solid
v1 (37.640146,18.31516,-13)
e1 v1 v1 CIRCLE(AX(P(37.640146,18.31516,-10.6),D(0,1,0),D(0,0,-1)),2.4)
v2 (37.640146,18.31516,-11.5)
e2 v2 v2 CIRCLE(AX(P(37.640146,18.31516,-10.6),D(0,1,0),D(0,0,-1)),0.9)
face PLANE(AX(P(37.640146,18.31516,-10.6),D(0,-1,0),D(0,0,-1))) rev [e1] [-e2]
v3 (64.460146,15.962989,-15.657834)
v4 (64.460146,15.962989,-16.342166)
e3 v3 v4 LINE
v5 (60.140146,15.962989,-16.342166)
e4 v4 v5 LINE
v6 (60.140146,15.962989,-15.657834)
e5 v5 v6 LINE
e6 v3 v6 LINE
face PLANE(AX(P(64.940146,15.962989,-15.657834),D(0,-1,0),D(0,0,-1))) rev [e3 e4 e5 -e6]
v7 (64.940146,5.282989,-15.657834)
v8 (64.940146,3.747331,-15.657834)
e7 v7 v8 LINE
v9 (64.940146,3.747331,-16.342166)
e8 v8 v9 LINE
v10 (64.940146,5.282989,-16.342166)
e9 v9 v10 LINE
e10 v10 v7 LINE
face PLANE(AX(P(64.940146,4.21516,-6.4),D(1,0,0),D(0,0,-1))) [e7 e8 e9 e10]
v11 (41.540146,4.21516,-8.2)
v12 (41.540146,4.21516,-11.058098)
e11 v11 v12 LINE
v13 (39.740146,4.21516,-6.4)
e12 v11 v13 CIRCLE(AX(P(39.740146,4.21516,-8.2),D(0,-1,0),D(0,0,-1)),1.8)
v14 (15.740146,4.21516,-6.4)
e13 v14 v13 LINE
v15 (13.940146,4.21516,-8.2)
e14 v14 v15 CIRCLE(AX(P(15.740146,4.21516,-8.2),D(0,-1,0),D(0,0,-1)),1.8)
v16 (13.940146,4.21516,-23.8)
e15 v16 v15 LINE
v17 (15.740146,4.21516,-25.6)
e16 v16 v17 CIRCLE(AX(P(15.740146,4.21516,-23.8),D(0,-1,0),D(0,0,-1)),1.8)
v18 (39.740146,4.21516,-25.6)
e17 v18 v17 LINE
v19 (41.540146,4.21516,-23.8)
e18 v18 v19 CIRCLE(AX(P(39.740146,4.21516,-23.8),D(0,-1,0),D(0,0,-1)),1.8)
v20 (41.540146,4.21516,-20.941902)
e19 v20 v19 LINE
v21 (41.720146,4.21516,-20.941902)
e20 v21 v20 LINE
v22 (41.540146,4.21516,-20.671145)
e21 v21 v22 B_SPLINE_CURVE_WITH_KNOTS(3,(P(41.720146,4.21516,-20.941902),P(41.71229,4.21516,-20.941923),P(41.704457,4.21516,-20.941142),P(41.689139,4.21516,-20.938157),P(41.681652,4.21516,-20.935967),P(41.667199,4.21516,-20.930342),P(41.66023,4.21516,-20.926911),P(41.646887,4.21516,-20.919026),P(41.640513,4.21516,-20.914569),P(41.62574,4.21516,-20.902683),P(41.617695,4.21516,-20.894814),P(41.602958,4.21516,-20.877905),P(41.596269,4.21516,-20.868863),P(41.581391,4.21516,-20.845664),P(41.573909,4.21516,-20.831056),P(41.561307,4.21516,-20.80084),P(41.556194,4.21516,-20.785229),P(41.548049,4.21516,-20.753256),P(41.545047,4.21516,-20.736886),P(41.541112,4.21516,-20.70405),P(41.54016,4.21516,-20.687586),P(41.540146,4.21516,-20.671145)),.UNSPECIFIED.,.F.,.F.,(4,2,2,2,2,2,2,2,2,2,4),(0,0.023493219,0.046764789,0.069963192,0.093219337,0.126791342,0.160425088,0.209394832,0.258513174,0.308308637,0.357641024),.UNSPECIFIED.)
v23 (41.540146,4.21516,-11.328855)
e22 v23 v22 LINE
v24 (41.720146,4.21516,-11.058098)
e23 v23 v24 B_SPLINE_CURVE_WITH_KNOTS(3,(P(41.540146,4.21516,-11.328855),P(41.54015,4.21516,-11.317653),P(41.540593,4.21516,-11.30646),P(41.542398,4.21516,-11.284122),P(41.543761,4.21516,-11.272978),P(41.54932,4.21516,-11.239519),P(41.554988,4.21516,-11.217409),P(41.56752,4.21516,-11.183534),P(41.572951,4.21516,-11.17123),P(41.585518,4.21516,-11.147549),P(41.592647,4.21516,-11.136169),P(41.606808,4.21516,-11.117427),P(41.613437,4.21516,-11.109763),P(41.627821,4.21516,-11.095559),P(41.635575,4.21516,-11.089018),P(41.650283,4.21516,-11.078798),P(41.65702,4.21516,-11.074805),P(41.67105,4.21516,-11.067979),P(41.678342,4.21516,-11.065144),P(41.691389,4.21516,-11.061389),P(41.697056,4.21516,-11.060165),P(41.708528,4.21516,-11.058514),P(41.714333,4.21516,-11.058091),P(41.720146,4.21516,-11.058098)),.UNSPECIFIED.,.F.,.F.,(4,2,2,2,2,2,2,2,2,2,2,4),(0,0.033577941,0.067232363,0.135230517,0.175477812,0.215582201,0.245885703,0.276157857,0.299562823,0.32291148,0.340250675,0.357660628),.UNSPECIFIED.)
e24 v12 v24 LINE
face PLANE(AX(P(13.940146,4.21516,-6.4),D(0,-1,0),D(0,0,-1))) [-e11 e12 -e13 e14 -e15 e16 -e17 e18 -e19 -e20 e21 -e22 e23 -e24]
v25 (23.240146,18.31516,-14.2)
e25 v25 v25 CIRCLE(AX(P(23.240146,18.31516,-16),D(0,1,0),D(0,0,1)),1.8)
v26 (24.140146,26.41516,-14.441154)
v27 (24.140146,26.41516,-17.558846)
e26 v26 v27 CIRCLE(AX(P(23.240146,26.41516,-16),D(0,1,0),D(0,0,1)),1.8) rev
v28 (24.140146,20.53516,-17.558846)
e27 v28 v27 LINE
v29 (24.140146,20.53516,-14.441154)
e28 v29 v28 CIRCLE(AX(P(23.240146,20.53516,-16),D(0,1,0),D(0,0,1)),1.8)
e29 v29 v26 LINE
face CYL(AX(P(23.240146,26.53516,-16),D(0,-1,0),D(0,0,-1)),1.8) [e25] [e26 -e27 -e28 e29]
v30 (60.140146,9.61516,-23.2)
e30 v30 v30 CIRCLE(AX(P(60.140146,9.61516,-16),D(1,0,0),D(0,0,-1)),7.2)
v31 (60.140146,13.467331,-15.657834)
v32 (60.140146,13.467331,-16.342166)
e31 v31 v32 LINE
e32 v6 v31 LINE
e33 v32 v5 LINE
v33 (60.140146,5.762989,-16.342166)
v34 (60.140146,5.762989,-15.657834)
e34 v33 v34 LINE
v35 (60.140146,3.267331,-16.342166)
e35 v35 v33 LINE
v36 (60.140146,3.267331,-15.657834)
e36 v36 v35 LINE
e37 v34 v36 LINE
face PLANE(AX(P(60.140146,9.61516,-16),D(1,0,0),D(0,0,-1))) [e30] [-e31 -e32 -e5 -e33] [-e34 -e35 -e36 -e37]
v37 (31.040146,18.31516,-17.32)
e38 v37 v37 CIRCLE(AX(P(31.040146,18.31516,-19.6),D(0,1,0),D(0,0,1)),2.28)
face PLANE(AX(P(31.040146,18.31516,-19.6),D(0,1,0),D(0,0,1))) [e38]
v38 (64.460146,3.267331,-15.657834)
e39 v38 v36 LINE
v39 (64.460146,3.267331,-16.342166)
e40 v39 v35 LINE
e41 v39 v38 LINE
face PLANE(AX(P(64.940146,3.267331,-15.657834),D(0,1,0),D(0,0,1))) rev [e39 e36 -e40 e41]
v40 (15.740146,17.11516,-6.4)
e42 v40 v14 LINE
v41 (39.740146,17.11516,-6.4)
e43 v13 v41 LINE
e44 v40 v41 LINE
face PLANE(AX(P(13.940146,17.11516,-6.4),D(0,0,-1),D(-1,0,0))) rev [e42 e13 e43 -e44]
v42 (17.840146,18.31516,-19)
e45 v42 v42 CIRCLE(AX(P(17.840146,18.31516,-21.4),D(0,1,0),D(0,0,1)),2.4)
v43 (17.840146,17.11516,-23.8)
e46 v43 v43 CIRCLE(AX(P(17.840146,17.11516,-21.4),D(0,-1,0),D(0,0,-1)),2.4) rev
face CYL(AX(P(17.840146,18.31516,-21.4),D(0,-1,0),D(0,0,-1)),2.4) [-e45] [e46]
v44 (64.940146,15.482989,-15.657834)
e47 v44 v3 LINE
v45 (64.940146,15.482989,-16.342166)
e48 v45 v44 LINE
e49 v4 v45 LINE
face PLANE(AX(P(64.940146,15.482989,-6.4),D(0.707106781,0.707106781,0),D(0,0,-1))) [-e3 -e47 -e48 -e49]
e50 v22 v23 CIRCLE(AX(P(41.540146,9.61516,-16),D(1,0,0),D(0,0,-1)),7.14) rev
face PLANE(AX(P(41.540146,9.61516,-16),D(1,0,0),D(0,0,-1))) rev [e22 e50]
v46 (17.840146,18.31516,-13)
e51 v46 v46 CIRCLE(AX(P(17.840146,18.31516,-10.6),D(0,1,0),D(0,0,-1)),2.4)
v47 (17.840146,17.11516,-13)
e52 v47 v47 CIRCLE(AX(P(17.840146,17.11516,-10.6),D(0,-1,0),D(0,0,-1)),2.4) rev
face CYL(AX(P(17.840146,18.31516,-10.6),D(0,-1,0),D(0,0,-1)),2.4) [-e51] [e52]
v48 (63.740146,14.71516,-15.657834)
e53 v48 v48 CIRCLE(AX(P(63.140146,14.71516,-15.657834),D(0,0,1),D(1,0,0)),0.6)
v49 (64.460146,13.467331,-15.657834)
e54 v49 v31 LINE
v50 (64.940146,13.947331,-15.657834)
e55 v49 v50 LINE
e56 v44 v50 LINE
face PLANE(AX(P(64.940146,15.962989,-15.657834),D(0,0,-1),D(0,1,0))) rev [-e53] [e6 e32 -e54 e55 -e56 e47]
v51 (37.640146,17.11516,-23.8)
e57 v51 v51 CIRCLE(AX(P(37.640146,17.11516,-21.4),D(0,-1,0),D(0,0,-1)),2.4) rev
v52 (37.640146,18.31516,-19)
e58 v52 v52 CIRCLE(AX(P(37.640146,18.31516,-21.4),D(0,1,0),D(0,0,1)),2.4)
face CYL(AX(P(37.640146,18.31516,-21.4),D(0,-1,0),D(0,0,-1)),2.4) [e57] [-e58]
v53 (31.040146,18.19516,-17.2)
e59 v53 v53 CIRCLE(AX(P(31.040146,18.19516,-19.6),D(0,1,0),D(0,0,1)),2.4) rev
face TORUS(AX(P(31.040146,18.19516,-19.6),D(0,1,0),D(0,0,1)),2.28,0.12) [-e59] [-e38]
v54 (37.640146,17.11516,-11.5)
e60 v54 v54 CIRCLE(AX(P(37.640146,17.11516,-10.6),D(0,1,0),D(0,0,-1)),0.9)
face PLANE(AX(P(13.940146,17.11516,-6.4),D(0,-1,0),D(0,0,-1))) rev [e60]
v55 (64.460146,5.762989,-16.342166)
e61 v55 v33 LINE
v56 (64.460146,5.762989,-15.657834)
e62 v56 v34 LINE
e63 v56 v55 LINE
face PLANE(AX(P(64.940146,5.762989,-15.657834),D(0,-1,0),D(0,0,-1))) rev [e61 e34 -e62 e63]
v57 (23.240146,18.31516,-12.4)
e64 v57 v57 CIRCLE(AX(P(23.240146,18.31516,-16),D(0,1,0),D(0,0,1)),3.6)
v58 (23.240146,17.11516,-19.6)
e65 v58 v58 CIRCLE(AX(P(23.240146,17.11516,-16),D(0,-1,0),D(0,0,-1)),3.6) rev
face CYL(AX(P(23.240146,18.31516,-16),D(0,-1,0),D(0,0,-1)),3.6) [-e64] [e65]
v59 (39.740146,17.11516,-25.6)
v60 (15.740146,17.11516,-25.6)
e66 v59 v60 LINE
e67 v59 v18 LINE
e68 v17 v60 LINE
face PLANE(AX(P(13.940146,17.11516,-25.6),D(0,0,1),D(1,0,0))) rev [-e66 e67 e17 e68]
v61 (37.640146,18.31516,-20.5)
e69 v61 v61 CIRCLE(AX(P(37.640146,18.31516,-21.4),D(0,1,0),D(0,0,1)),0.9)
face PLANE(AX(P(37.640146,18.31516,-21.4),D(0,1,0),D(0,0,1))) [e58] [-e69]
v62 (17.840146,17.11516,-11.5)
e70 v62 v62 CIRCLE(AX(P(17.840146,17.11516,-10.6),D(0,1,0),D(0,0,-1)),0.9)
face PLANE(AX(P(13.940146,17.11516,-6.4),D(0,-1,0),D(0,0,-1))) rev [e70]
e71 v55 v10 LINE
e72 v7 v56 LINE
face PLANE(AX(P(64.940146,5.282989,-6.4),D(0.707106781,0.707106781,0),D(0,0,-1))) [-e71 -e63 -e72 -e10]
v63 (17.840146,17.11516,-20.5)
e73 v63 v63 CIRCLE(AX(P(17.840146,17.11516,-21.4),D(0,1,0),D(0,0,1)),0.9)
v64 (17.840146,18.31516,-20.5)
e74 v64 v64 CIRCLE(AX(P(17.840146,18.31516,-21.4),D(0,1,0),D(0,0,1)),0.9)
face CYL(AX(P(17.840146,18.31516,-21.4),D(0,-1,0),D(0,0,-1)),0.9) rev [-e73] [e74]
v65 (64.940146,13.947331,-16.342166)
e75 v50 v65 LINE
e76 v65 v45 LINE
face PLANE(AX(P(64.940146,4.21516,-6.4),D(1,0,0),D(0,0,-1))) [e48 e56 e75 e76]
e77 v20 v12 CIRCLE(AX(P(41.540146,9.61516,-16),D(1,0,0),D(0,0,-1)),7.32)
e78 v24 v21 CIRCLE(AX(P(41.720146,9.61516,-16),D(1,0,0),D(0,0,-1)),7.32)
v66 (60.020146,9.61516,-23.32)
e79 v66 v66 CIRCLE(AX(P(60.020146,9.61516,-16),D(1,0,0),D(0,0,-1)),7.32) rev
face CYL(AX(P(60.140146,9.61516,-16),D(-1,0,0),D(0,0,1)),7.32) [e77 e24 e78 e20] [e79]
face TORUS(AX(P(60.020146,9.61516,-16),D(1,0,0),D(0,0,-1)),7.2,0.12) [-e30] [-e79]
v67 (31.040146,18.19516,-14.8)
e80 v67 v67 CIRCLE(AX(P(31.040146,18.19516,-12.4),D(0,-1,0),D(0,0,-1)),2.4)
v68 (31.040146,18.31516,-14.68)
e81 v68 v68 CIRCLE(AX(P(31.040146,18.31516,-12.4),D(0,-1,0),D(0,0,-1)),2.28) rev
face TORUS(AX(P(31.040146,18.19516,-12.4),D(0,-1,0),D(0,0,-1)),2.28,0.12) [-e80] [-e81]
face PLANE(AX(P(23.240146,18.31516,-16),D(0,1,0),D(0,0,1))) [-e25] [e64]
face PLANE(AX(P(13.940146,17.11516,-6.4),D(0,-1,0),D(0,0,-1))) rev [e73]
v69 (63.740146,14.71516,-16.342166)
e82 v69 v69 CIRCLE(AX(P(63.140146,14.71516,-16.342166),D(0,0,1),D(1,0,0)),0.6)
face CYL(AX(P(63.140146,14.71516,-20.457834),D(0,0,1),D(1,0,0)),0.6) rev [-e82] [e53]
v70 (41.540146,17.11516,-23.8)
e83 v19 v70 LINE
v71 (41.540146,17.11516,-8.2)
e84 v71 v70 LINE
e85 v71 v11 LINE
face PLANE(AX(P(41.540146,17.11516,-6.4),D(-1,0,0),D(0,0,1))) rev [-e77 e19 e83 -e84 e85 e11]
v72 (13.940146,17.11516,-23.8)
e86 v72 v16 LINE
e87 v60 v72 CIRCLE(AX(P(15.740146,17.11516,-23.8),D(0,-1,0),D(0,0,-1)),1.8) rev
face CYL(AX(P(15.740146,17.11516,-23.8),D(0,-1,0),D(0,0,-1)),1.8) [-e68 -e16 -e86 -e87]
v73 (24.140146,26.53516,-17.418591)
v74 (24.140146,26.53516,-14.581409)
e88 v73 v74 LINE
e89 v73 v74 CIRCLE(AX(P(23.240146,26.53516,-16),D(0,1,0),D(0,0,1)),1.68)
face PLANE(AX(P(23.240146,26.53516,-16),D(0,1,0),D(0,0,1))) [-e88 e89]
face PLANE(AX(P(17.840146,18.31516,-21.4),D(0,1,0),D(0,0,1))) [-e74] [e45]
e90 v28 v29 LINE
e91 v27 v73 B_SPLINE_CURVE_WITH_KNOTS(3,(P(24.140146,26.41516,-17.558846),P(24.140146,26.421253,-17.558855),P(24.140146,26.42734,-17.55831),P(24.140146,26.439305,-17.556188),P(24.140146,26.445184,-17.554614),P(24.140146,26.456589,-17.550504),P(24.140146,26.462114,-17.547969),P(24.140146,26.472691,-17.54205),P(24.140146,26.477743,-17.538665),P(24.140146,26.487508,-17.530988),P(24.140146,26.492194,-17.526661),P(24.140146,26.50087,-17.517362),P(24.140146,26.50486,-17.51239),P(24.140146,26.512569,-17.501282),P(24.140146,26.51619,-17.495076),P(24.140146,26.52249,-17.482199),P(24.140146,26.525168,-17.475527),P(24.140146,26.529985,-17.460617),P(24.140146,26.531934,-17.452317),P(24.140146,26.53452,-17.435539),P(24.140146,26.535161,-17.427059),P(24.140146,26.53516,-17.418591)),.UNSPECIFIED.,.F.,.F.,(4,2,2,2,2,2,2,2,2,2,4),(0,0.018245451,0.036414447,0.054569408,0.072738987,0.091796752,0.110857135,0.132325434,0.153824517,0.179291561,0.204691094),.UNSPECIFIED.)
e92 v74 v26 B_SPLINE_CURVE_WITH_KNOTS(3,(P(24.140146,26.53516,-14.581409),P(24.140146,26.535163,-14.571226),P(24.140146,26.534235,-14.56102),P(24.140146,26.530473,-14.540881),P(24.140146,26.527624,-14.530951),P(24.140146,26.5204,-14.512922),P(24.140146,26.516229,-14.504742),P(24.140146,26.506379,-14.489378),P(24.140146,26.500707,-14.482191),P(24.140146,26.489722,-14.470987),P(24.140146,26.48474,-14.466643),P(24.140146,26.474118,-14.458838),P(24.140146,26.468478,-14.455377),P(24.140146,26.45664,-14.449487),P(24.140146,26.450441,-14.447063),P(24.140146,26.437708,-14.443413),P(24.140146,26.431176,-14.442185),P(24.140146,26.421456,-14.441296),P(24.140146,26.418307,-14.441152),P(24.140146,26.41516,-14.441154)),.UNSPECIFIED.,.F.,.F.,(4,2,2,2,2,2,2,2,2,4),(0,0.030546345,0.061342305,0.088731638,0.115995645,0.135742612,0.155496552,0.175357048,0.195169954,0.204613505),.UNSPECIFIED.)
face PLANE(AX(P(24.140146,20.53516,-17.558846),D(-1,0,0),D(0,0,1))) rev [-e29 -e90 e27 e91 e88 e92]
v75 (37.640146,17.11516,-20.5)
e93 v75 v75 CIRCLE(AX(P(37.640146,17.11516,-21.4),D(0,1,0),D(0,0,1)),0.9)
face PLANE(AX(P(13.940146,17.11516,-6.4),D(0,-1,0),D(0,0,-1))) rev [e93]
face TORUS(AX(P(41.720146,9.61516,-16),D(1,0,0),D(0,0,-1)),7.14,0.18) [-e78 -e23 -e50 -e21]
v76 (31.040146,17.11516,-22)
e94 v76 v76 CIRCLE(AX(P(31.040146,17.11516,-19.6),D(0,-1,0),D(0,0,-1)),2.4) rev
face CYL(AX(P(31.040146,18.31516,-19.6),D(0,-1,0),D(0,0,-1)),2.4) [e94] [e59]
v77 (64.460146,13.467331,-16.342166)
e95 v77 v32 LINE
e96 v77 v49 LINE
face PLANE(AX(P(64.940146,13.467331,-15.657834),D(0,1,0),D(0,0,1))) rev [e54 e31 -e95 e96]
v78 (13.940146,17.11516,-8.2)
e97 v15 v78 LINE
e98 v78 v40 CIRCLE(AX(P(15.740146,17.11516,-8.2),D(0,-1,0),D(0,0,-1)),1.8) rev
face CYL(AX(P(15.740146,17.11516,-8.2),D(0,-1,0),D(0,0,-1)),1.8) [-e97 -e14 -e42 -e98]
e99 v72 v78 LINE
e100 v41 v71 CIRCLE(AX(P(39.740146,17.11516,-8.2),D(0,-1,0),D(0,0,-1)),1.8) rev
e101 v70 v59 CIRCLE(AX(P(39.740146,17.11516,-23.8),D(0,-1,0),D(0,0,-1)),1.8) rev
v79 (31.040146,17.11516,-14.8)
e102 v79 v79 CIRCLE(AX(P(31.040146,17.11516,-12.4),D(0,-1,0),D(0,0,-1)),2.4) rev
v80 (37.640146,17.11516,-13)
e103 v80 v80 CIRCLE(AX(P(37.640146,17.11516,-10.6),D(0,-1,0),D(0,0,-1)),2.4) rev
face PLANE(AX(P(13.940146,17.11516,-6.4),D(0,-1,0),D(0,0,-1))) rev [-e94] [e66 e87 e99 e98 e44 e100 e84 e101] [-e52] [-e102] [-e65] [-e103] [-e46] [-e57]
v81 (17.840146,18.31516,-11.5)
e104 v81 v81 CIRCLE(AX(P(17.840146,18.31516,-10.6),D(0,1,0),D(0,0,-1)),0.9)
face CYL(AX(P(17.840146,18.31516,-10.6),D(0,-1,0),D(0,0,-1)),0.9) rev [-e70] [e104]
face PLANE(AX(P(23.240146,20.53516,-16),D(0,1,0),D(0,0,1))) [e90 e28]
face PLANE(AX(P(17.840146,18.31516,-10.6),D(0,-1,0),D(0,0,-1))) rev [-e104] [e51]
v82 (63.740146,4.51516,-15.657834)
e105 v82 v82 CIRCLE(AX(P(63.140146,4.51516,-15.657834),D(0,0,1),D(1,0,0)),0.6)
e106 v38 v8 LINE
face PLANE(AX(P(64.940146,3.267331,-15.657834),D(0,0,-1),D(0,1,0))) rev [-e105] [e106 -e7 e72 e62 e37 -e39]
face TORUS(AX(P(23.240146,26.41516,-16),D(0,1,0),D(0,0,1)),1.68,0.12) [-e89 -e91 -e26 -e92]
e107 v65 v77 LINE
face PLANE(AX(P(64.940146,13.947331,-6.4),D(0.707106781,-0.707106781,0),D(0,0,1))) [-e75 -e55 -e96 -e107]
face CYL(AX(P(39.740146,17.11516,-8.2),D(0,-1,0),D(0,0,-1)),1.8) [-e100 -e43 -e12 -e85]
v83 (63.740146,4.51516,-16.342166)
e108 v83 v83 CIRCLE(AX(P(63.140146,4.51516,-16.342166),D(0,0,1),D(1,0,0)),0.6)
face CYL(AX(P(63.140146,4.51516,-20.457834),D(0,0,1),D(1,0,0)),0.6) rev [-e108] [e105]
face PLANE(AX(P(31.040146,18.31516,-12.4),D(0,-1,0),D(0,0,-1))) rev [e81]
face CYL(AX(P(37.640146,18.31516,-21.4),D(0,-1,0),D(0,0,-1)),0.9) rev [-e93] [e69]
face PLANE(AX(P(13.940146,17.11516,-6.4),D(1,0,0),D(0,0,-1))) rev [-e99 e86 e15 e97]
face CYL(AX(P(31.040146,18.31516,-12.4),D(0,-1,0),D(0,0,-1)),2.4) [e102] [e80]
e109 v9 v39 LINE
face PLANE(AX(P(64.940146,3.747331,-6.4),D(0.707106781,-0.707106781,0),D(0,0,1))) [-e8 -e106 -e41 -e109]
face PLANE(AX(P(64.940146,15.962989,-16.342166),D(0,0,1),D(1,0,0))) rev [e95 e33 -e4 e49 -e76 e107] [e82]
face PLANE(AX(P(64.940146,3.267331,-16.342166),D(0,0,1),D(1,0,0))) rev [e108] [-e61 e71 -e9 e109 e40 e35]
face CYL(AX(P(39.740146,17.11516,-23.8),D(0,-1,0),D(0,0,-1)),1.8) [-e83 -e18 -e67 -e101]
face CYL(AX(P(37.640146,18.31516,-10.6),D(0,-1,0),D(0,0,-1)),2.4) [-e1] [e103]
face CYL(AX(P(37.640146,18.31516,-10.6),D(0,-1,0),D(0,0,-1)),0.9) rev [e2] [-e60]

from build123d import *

# Parameters (mm, degrees)
SKETCH1_W           = 46
SKETCH1_H           = 32
BOSS_EXTRUDE1_DEPTH = 21.5
SKETCH2_R           = 4
SKETCH2_R_2         = 1.5
BOSS_EXTRUDE2_DEPTH = 2
FILLET1_R           = 3
FILLET2_R           = 3
SKETCH3_R           = 3
BOSS_EXTRUDE3_DEPTH = 15.7
CUT_EXTRUDE1_START  = -10
CUT_EXTRUDE1_DEPTH  = 10
SKETCH6_R           = 6
BOSS_EXTRUDE4_DEPTH = 2
SKETCH7_R           = 12.2
BOSS_EXTRUDE5_DEPTH = 31
SKETCH8_W           = 1.14055435
SKETCH8_H           = 4.159430758
BOSS_EXTRUDE6_DEPTH = 8
CHAMFER1_SIZE       = 0.8
CHAMFER2_SIZE       = 0.8
SKETCH9_R           = 1
CUT_EXTRUDE2_DEPTH  = 8
SKETCH10_R          = 4
BOSS_EXTRUDE7_DEPTH = 2
FILLET3_R           = 0.2
FILLET4_R           = 0.2
FILLET5_R           = 0.2
FILLET6_R           = 0.2
FILLET7_R           = 0.3
SCALE3_SCALE        = 0.6


with BuildPart() as part:
    # Sketch1 → Boss-Extrude1 (new body)
    with BuildSketch(Plane(origin=(0, 0, 0), x_dir=(1, 0, 0), z_dir=(0, 1, 0))):
        with Locations((23, 16)):
            Rectangle(SKETCH1_W, SKETCH1_H)
    extrude(amount=BOSS_EXTRUDE1_DEPTH)

    # Sketch2 → Boss-Extrude2 (add)
    # profile 1 of 4: a face of its own
    with BuildSketch(Plane(origin=(0, 21.5, 0), x_dir=(1, 0, 0), z_dir=(0, 1, 0))):
        with Locations(Location((6.5, 25, 0), (0, 0, 90))):
            Circle(SKETCH2_R)
        with Locations(Location((6.5, 25, 0), (0, 0, 270))):
            Circle(SKETCH2_R_2, mode=Mode.SUBTRACT)
    # profile 2 of 4: a face of its own
    with BuildSketch(Plane(origin=(0, 21.5, 0), x_dir=(1, 0, 0), z_dir=(0, 1, 0))):
        with Locations(Location((39.5, 25, 0), (0, 0, 90))):
            Circle(SKETCH2_R)
        with Locations(Location((39.5, 25, 0), (0, 0, 270))):
            Circle(SKETCH2_R_2, mode=Mode.SUBTRACT)
    # profile 3 of 4: a face of its own
    with BuildSketch(Plane(origin=(0, 21.5, 0), x_dir=(1, 0, 0), z_dir=(0, 1, 0))):
        with Locations(Location((39.5, 7, 0), (0, 0, 90))):
            Circle(SKETCH2_R)
        with Locations(Location((39.5, 7, 0), (0, 0, 90))):
            Circle(SKETCH2_R_2, mode=Mode.SUBTRACT)
    # profile 4 of 4: a face of its own
    with BuildSketch(Plane(origin=(0, 21.5, 0), x_dir=(1, 0, 0), z_dir=(0, 1, 0))):
        with Locations(Location((6.5, 7, 0), (0, 0, 90))):
            Circle(SKETCH2_R)
        with Locations(Location((6.5, 7, 0), (0, 0, 90))):
            Circle(SKETCH2_R_2, mode=Mode.SUBTRACT)
    extrude(amount=BOSS_EXTRUDE2_DEPTH)

    # Fillet1
    fillet1_edges = [part.edges().sort_by_distance(p)[0] for p in [
        (46, 10.75, -32),
    ]]
    fillet(fillet1_edges, radius=FILLET1_R)

    # Fillet2
    fillet2_edges = [part.edges().sort_by_distance(p)[0] for p in [
        (0, 10.75, -32),
        (46, 10.75, 0),
        (0, 10.75, 0),
    ]]
    fillet(fillet2_edges, radius=FILLET2_R)

    # Sketch3 → Boss-Extrude3 (add)
    with BuildSketch(Plane(origin=(0, 21.5, 0), x_dir=(1, 0, 0), z_dir=(0, 1, 0))):
        with Locations(Location((15.5, 16, 0), (0, 0, 90))):
            Circle(SKETCH3_R)
    extrude(amount=BOSS_EXTRUDE3_DEPTH)

    # Sketch5 → Cut-Extrude1 (cut)
    with BuildSketch(Plane(origin=(0, 37.2, 0), x_dir=(1, 0, 0), z_dir=(0, 1, 0)).offset(CUT_EXTRUDE1_START)):
        with BuildLine():
            Line((17, 18.598076211), (17, 13.401923789))
            ThreePointArc((17, 13.401923789), (18.5, 16), (17, 18.598076211))
        make_face()
    extrude(amount=CUT_EXTRUDE1_DEPTH, mode=Mode.SUBTRACT)

    # Sketch6 → Boss-Extrude4 (add)
    with BuildSketch(Plane(origin=(0, 21.5, 0), x_dir=(1, 0, 0), z_dir=(0, 1, 0))):
        with Locations(Location((15.5, 16, 0), (0, 0, 90))):
            Circle(SKETCH6_R)
    extrude(amount=BOSS_EXTRUDE4_DEPTH)

    # Sketch7 → Boss-Extrude5 (add)
    with BuildSketch(Plane(origin=(46, 0, 0), x_dir=(0, 0, -1), z_dir=(1, 0, 0))):
        with Locations(Location((16, 9, 0), (0, 0, 227.536275048))):
            Circle(SKETCH7_R)
    extrude(amount=BOSS_EXTRUDE5_DEPTH)

    # Sketch8 → Boss-Extrude6 (add)
    with BuildSketch(Plane(origin=(77, 0, 0), x_dir=(0, 0, -1), z_dir=(1, 0, 0))):
        with Locations((16, 17.5)):
            Rectangle(SKETCH8_W, SKETCH8_H)
        with Locations((16, 0.5)):
            Rectangle(SKETCH8_W, SKETCH8_H)
    extrude(amount=BOSS_EXTRUDE6_DEPTH)

    # Chamfer1
    chamfer1_edges = [part.edges().sort_by_distance(p)[0] for p in [
        (85, 19.579715379, -16),
    ]]
    chamfer(chamfer1_edges, length=CHAMFER1_SIZE)

    # Chamfer2
    chamfer2_edges = [part.edges().sort_by_distance(p)[0] for p in [
        (85, -1.579715379, -16),
        (85, 2.579715379, -16),
        (85, 15.420284621, -16),
    ]]
    chamfer(chamfer2_edges, length=CHAMFER2_SIZE)

    # Sketch9 → Cut-Extrude2 (cut)
    with BuildSketch(Plane.XY.offset(-15.429722825)):
        with Locations((82, 17.5)):
            Circle(SKETCH9_R)
        with Locations((82, 0.5)):
            Circle(SKETCH9_R)
    extrude(amount=-CUT_EXTRUDE2_DEPTH, mode=Mode.SUBTRACT)

    # Sketch10 → Boss-Extrude7 (add)
    with BuildSketch(Plane(origin=(0, 21.5, 0), x_dir=(1, 0, 0), z_dir=(0, 1, 0))):
        with Locations(Location((28.5, 22, 0), (0, 0, 90))):
            Circle(SKETCH10_R)
        with Locations(Location((28.5, 10, 0), (0, 0, 90))):
            Circle(SKETCH10_R)
    extrude(amount=BOSS_EXTRUDE7_DEPTH)

    # Fillet3
    fillet3_edges = [part.edges().sort_by_distance(p)[0] for p in [
        (28.5, 23.5, -6),
    ]]
    fillet(fillet3_edges, radius=FILLET3_R)

    # Fillet4
    fillet4_edges = [part.edges().sort_by_distance(p)[0] for p in [
        (28.5, 23.5, -18),
    ]]
    fillet(fillet4_edges, radius=FILLET4_R)

    # Fillet5
    fillet5_edges = [part.edges().sort_by_distance(p)[0] for p in [
        (12.602222521, 37.2, -15.223542865),
    ]]
    fillet(fillet5_edges, radius=FILLET5_R)

    # Fillet6
    fillet6_edges = [part.edges().sort_by_distance(p)[0] for p in [
        (77, 18, -24.236504113),
    ]]
    fillet(fillet6_edges, radius=FILLET6_R)

    # Fillet7
    # the kernel refuses this fillet: 0.3 mm, written as the material it takes off along each edge
    with BuildSketch(Plane(origin=(46, 9, -16), x_dir=(0, -0.6948182221031018, 0.7191853990686162), z_dir=(0, 0.7191853990686162, 0.6948182221031018))) as fillet7_piece_1_section:
        with BuildLine():
            CenterArc((12.2 - FILLET7_R, FILLET7_R), FILLET7_R, 270, 90)
            Line((12.2 - FILLET7_R, 0), (12.2, 0))
            Line((12.2, 0), (12.2, FILLET7_R))
        make_face()
    fillet7_piece_1 = revolve(axis=Axis((46, 9, -16), (1, 0, 0)), revolution_arc=91.974532738, mode=Mode.PRIVATE)
    fillet7_piece_1 = split(fillet7_piece_1, bisect_by=Plane(origin=(46.082910909, 0, -16), z_dir=(0, -1, 0)), keep=Keep.TOP, mode=Mode.PRIVATE)
    add(fillet7_piece_1, mode=Mode.SUBTRACT)


with BuildPart() as part_1:
    # Scale3: scaled about (34.850364497, 10.537899591, -15.999999996)
    add(part.part.scale(SCALE3_SCALE).moved(Location((13.940145799, 4.215159836, -6.399999998))))


solid = part_1.part
